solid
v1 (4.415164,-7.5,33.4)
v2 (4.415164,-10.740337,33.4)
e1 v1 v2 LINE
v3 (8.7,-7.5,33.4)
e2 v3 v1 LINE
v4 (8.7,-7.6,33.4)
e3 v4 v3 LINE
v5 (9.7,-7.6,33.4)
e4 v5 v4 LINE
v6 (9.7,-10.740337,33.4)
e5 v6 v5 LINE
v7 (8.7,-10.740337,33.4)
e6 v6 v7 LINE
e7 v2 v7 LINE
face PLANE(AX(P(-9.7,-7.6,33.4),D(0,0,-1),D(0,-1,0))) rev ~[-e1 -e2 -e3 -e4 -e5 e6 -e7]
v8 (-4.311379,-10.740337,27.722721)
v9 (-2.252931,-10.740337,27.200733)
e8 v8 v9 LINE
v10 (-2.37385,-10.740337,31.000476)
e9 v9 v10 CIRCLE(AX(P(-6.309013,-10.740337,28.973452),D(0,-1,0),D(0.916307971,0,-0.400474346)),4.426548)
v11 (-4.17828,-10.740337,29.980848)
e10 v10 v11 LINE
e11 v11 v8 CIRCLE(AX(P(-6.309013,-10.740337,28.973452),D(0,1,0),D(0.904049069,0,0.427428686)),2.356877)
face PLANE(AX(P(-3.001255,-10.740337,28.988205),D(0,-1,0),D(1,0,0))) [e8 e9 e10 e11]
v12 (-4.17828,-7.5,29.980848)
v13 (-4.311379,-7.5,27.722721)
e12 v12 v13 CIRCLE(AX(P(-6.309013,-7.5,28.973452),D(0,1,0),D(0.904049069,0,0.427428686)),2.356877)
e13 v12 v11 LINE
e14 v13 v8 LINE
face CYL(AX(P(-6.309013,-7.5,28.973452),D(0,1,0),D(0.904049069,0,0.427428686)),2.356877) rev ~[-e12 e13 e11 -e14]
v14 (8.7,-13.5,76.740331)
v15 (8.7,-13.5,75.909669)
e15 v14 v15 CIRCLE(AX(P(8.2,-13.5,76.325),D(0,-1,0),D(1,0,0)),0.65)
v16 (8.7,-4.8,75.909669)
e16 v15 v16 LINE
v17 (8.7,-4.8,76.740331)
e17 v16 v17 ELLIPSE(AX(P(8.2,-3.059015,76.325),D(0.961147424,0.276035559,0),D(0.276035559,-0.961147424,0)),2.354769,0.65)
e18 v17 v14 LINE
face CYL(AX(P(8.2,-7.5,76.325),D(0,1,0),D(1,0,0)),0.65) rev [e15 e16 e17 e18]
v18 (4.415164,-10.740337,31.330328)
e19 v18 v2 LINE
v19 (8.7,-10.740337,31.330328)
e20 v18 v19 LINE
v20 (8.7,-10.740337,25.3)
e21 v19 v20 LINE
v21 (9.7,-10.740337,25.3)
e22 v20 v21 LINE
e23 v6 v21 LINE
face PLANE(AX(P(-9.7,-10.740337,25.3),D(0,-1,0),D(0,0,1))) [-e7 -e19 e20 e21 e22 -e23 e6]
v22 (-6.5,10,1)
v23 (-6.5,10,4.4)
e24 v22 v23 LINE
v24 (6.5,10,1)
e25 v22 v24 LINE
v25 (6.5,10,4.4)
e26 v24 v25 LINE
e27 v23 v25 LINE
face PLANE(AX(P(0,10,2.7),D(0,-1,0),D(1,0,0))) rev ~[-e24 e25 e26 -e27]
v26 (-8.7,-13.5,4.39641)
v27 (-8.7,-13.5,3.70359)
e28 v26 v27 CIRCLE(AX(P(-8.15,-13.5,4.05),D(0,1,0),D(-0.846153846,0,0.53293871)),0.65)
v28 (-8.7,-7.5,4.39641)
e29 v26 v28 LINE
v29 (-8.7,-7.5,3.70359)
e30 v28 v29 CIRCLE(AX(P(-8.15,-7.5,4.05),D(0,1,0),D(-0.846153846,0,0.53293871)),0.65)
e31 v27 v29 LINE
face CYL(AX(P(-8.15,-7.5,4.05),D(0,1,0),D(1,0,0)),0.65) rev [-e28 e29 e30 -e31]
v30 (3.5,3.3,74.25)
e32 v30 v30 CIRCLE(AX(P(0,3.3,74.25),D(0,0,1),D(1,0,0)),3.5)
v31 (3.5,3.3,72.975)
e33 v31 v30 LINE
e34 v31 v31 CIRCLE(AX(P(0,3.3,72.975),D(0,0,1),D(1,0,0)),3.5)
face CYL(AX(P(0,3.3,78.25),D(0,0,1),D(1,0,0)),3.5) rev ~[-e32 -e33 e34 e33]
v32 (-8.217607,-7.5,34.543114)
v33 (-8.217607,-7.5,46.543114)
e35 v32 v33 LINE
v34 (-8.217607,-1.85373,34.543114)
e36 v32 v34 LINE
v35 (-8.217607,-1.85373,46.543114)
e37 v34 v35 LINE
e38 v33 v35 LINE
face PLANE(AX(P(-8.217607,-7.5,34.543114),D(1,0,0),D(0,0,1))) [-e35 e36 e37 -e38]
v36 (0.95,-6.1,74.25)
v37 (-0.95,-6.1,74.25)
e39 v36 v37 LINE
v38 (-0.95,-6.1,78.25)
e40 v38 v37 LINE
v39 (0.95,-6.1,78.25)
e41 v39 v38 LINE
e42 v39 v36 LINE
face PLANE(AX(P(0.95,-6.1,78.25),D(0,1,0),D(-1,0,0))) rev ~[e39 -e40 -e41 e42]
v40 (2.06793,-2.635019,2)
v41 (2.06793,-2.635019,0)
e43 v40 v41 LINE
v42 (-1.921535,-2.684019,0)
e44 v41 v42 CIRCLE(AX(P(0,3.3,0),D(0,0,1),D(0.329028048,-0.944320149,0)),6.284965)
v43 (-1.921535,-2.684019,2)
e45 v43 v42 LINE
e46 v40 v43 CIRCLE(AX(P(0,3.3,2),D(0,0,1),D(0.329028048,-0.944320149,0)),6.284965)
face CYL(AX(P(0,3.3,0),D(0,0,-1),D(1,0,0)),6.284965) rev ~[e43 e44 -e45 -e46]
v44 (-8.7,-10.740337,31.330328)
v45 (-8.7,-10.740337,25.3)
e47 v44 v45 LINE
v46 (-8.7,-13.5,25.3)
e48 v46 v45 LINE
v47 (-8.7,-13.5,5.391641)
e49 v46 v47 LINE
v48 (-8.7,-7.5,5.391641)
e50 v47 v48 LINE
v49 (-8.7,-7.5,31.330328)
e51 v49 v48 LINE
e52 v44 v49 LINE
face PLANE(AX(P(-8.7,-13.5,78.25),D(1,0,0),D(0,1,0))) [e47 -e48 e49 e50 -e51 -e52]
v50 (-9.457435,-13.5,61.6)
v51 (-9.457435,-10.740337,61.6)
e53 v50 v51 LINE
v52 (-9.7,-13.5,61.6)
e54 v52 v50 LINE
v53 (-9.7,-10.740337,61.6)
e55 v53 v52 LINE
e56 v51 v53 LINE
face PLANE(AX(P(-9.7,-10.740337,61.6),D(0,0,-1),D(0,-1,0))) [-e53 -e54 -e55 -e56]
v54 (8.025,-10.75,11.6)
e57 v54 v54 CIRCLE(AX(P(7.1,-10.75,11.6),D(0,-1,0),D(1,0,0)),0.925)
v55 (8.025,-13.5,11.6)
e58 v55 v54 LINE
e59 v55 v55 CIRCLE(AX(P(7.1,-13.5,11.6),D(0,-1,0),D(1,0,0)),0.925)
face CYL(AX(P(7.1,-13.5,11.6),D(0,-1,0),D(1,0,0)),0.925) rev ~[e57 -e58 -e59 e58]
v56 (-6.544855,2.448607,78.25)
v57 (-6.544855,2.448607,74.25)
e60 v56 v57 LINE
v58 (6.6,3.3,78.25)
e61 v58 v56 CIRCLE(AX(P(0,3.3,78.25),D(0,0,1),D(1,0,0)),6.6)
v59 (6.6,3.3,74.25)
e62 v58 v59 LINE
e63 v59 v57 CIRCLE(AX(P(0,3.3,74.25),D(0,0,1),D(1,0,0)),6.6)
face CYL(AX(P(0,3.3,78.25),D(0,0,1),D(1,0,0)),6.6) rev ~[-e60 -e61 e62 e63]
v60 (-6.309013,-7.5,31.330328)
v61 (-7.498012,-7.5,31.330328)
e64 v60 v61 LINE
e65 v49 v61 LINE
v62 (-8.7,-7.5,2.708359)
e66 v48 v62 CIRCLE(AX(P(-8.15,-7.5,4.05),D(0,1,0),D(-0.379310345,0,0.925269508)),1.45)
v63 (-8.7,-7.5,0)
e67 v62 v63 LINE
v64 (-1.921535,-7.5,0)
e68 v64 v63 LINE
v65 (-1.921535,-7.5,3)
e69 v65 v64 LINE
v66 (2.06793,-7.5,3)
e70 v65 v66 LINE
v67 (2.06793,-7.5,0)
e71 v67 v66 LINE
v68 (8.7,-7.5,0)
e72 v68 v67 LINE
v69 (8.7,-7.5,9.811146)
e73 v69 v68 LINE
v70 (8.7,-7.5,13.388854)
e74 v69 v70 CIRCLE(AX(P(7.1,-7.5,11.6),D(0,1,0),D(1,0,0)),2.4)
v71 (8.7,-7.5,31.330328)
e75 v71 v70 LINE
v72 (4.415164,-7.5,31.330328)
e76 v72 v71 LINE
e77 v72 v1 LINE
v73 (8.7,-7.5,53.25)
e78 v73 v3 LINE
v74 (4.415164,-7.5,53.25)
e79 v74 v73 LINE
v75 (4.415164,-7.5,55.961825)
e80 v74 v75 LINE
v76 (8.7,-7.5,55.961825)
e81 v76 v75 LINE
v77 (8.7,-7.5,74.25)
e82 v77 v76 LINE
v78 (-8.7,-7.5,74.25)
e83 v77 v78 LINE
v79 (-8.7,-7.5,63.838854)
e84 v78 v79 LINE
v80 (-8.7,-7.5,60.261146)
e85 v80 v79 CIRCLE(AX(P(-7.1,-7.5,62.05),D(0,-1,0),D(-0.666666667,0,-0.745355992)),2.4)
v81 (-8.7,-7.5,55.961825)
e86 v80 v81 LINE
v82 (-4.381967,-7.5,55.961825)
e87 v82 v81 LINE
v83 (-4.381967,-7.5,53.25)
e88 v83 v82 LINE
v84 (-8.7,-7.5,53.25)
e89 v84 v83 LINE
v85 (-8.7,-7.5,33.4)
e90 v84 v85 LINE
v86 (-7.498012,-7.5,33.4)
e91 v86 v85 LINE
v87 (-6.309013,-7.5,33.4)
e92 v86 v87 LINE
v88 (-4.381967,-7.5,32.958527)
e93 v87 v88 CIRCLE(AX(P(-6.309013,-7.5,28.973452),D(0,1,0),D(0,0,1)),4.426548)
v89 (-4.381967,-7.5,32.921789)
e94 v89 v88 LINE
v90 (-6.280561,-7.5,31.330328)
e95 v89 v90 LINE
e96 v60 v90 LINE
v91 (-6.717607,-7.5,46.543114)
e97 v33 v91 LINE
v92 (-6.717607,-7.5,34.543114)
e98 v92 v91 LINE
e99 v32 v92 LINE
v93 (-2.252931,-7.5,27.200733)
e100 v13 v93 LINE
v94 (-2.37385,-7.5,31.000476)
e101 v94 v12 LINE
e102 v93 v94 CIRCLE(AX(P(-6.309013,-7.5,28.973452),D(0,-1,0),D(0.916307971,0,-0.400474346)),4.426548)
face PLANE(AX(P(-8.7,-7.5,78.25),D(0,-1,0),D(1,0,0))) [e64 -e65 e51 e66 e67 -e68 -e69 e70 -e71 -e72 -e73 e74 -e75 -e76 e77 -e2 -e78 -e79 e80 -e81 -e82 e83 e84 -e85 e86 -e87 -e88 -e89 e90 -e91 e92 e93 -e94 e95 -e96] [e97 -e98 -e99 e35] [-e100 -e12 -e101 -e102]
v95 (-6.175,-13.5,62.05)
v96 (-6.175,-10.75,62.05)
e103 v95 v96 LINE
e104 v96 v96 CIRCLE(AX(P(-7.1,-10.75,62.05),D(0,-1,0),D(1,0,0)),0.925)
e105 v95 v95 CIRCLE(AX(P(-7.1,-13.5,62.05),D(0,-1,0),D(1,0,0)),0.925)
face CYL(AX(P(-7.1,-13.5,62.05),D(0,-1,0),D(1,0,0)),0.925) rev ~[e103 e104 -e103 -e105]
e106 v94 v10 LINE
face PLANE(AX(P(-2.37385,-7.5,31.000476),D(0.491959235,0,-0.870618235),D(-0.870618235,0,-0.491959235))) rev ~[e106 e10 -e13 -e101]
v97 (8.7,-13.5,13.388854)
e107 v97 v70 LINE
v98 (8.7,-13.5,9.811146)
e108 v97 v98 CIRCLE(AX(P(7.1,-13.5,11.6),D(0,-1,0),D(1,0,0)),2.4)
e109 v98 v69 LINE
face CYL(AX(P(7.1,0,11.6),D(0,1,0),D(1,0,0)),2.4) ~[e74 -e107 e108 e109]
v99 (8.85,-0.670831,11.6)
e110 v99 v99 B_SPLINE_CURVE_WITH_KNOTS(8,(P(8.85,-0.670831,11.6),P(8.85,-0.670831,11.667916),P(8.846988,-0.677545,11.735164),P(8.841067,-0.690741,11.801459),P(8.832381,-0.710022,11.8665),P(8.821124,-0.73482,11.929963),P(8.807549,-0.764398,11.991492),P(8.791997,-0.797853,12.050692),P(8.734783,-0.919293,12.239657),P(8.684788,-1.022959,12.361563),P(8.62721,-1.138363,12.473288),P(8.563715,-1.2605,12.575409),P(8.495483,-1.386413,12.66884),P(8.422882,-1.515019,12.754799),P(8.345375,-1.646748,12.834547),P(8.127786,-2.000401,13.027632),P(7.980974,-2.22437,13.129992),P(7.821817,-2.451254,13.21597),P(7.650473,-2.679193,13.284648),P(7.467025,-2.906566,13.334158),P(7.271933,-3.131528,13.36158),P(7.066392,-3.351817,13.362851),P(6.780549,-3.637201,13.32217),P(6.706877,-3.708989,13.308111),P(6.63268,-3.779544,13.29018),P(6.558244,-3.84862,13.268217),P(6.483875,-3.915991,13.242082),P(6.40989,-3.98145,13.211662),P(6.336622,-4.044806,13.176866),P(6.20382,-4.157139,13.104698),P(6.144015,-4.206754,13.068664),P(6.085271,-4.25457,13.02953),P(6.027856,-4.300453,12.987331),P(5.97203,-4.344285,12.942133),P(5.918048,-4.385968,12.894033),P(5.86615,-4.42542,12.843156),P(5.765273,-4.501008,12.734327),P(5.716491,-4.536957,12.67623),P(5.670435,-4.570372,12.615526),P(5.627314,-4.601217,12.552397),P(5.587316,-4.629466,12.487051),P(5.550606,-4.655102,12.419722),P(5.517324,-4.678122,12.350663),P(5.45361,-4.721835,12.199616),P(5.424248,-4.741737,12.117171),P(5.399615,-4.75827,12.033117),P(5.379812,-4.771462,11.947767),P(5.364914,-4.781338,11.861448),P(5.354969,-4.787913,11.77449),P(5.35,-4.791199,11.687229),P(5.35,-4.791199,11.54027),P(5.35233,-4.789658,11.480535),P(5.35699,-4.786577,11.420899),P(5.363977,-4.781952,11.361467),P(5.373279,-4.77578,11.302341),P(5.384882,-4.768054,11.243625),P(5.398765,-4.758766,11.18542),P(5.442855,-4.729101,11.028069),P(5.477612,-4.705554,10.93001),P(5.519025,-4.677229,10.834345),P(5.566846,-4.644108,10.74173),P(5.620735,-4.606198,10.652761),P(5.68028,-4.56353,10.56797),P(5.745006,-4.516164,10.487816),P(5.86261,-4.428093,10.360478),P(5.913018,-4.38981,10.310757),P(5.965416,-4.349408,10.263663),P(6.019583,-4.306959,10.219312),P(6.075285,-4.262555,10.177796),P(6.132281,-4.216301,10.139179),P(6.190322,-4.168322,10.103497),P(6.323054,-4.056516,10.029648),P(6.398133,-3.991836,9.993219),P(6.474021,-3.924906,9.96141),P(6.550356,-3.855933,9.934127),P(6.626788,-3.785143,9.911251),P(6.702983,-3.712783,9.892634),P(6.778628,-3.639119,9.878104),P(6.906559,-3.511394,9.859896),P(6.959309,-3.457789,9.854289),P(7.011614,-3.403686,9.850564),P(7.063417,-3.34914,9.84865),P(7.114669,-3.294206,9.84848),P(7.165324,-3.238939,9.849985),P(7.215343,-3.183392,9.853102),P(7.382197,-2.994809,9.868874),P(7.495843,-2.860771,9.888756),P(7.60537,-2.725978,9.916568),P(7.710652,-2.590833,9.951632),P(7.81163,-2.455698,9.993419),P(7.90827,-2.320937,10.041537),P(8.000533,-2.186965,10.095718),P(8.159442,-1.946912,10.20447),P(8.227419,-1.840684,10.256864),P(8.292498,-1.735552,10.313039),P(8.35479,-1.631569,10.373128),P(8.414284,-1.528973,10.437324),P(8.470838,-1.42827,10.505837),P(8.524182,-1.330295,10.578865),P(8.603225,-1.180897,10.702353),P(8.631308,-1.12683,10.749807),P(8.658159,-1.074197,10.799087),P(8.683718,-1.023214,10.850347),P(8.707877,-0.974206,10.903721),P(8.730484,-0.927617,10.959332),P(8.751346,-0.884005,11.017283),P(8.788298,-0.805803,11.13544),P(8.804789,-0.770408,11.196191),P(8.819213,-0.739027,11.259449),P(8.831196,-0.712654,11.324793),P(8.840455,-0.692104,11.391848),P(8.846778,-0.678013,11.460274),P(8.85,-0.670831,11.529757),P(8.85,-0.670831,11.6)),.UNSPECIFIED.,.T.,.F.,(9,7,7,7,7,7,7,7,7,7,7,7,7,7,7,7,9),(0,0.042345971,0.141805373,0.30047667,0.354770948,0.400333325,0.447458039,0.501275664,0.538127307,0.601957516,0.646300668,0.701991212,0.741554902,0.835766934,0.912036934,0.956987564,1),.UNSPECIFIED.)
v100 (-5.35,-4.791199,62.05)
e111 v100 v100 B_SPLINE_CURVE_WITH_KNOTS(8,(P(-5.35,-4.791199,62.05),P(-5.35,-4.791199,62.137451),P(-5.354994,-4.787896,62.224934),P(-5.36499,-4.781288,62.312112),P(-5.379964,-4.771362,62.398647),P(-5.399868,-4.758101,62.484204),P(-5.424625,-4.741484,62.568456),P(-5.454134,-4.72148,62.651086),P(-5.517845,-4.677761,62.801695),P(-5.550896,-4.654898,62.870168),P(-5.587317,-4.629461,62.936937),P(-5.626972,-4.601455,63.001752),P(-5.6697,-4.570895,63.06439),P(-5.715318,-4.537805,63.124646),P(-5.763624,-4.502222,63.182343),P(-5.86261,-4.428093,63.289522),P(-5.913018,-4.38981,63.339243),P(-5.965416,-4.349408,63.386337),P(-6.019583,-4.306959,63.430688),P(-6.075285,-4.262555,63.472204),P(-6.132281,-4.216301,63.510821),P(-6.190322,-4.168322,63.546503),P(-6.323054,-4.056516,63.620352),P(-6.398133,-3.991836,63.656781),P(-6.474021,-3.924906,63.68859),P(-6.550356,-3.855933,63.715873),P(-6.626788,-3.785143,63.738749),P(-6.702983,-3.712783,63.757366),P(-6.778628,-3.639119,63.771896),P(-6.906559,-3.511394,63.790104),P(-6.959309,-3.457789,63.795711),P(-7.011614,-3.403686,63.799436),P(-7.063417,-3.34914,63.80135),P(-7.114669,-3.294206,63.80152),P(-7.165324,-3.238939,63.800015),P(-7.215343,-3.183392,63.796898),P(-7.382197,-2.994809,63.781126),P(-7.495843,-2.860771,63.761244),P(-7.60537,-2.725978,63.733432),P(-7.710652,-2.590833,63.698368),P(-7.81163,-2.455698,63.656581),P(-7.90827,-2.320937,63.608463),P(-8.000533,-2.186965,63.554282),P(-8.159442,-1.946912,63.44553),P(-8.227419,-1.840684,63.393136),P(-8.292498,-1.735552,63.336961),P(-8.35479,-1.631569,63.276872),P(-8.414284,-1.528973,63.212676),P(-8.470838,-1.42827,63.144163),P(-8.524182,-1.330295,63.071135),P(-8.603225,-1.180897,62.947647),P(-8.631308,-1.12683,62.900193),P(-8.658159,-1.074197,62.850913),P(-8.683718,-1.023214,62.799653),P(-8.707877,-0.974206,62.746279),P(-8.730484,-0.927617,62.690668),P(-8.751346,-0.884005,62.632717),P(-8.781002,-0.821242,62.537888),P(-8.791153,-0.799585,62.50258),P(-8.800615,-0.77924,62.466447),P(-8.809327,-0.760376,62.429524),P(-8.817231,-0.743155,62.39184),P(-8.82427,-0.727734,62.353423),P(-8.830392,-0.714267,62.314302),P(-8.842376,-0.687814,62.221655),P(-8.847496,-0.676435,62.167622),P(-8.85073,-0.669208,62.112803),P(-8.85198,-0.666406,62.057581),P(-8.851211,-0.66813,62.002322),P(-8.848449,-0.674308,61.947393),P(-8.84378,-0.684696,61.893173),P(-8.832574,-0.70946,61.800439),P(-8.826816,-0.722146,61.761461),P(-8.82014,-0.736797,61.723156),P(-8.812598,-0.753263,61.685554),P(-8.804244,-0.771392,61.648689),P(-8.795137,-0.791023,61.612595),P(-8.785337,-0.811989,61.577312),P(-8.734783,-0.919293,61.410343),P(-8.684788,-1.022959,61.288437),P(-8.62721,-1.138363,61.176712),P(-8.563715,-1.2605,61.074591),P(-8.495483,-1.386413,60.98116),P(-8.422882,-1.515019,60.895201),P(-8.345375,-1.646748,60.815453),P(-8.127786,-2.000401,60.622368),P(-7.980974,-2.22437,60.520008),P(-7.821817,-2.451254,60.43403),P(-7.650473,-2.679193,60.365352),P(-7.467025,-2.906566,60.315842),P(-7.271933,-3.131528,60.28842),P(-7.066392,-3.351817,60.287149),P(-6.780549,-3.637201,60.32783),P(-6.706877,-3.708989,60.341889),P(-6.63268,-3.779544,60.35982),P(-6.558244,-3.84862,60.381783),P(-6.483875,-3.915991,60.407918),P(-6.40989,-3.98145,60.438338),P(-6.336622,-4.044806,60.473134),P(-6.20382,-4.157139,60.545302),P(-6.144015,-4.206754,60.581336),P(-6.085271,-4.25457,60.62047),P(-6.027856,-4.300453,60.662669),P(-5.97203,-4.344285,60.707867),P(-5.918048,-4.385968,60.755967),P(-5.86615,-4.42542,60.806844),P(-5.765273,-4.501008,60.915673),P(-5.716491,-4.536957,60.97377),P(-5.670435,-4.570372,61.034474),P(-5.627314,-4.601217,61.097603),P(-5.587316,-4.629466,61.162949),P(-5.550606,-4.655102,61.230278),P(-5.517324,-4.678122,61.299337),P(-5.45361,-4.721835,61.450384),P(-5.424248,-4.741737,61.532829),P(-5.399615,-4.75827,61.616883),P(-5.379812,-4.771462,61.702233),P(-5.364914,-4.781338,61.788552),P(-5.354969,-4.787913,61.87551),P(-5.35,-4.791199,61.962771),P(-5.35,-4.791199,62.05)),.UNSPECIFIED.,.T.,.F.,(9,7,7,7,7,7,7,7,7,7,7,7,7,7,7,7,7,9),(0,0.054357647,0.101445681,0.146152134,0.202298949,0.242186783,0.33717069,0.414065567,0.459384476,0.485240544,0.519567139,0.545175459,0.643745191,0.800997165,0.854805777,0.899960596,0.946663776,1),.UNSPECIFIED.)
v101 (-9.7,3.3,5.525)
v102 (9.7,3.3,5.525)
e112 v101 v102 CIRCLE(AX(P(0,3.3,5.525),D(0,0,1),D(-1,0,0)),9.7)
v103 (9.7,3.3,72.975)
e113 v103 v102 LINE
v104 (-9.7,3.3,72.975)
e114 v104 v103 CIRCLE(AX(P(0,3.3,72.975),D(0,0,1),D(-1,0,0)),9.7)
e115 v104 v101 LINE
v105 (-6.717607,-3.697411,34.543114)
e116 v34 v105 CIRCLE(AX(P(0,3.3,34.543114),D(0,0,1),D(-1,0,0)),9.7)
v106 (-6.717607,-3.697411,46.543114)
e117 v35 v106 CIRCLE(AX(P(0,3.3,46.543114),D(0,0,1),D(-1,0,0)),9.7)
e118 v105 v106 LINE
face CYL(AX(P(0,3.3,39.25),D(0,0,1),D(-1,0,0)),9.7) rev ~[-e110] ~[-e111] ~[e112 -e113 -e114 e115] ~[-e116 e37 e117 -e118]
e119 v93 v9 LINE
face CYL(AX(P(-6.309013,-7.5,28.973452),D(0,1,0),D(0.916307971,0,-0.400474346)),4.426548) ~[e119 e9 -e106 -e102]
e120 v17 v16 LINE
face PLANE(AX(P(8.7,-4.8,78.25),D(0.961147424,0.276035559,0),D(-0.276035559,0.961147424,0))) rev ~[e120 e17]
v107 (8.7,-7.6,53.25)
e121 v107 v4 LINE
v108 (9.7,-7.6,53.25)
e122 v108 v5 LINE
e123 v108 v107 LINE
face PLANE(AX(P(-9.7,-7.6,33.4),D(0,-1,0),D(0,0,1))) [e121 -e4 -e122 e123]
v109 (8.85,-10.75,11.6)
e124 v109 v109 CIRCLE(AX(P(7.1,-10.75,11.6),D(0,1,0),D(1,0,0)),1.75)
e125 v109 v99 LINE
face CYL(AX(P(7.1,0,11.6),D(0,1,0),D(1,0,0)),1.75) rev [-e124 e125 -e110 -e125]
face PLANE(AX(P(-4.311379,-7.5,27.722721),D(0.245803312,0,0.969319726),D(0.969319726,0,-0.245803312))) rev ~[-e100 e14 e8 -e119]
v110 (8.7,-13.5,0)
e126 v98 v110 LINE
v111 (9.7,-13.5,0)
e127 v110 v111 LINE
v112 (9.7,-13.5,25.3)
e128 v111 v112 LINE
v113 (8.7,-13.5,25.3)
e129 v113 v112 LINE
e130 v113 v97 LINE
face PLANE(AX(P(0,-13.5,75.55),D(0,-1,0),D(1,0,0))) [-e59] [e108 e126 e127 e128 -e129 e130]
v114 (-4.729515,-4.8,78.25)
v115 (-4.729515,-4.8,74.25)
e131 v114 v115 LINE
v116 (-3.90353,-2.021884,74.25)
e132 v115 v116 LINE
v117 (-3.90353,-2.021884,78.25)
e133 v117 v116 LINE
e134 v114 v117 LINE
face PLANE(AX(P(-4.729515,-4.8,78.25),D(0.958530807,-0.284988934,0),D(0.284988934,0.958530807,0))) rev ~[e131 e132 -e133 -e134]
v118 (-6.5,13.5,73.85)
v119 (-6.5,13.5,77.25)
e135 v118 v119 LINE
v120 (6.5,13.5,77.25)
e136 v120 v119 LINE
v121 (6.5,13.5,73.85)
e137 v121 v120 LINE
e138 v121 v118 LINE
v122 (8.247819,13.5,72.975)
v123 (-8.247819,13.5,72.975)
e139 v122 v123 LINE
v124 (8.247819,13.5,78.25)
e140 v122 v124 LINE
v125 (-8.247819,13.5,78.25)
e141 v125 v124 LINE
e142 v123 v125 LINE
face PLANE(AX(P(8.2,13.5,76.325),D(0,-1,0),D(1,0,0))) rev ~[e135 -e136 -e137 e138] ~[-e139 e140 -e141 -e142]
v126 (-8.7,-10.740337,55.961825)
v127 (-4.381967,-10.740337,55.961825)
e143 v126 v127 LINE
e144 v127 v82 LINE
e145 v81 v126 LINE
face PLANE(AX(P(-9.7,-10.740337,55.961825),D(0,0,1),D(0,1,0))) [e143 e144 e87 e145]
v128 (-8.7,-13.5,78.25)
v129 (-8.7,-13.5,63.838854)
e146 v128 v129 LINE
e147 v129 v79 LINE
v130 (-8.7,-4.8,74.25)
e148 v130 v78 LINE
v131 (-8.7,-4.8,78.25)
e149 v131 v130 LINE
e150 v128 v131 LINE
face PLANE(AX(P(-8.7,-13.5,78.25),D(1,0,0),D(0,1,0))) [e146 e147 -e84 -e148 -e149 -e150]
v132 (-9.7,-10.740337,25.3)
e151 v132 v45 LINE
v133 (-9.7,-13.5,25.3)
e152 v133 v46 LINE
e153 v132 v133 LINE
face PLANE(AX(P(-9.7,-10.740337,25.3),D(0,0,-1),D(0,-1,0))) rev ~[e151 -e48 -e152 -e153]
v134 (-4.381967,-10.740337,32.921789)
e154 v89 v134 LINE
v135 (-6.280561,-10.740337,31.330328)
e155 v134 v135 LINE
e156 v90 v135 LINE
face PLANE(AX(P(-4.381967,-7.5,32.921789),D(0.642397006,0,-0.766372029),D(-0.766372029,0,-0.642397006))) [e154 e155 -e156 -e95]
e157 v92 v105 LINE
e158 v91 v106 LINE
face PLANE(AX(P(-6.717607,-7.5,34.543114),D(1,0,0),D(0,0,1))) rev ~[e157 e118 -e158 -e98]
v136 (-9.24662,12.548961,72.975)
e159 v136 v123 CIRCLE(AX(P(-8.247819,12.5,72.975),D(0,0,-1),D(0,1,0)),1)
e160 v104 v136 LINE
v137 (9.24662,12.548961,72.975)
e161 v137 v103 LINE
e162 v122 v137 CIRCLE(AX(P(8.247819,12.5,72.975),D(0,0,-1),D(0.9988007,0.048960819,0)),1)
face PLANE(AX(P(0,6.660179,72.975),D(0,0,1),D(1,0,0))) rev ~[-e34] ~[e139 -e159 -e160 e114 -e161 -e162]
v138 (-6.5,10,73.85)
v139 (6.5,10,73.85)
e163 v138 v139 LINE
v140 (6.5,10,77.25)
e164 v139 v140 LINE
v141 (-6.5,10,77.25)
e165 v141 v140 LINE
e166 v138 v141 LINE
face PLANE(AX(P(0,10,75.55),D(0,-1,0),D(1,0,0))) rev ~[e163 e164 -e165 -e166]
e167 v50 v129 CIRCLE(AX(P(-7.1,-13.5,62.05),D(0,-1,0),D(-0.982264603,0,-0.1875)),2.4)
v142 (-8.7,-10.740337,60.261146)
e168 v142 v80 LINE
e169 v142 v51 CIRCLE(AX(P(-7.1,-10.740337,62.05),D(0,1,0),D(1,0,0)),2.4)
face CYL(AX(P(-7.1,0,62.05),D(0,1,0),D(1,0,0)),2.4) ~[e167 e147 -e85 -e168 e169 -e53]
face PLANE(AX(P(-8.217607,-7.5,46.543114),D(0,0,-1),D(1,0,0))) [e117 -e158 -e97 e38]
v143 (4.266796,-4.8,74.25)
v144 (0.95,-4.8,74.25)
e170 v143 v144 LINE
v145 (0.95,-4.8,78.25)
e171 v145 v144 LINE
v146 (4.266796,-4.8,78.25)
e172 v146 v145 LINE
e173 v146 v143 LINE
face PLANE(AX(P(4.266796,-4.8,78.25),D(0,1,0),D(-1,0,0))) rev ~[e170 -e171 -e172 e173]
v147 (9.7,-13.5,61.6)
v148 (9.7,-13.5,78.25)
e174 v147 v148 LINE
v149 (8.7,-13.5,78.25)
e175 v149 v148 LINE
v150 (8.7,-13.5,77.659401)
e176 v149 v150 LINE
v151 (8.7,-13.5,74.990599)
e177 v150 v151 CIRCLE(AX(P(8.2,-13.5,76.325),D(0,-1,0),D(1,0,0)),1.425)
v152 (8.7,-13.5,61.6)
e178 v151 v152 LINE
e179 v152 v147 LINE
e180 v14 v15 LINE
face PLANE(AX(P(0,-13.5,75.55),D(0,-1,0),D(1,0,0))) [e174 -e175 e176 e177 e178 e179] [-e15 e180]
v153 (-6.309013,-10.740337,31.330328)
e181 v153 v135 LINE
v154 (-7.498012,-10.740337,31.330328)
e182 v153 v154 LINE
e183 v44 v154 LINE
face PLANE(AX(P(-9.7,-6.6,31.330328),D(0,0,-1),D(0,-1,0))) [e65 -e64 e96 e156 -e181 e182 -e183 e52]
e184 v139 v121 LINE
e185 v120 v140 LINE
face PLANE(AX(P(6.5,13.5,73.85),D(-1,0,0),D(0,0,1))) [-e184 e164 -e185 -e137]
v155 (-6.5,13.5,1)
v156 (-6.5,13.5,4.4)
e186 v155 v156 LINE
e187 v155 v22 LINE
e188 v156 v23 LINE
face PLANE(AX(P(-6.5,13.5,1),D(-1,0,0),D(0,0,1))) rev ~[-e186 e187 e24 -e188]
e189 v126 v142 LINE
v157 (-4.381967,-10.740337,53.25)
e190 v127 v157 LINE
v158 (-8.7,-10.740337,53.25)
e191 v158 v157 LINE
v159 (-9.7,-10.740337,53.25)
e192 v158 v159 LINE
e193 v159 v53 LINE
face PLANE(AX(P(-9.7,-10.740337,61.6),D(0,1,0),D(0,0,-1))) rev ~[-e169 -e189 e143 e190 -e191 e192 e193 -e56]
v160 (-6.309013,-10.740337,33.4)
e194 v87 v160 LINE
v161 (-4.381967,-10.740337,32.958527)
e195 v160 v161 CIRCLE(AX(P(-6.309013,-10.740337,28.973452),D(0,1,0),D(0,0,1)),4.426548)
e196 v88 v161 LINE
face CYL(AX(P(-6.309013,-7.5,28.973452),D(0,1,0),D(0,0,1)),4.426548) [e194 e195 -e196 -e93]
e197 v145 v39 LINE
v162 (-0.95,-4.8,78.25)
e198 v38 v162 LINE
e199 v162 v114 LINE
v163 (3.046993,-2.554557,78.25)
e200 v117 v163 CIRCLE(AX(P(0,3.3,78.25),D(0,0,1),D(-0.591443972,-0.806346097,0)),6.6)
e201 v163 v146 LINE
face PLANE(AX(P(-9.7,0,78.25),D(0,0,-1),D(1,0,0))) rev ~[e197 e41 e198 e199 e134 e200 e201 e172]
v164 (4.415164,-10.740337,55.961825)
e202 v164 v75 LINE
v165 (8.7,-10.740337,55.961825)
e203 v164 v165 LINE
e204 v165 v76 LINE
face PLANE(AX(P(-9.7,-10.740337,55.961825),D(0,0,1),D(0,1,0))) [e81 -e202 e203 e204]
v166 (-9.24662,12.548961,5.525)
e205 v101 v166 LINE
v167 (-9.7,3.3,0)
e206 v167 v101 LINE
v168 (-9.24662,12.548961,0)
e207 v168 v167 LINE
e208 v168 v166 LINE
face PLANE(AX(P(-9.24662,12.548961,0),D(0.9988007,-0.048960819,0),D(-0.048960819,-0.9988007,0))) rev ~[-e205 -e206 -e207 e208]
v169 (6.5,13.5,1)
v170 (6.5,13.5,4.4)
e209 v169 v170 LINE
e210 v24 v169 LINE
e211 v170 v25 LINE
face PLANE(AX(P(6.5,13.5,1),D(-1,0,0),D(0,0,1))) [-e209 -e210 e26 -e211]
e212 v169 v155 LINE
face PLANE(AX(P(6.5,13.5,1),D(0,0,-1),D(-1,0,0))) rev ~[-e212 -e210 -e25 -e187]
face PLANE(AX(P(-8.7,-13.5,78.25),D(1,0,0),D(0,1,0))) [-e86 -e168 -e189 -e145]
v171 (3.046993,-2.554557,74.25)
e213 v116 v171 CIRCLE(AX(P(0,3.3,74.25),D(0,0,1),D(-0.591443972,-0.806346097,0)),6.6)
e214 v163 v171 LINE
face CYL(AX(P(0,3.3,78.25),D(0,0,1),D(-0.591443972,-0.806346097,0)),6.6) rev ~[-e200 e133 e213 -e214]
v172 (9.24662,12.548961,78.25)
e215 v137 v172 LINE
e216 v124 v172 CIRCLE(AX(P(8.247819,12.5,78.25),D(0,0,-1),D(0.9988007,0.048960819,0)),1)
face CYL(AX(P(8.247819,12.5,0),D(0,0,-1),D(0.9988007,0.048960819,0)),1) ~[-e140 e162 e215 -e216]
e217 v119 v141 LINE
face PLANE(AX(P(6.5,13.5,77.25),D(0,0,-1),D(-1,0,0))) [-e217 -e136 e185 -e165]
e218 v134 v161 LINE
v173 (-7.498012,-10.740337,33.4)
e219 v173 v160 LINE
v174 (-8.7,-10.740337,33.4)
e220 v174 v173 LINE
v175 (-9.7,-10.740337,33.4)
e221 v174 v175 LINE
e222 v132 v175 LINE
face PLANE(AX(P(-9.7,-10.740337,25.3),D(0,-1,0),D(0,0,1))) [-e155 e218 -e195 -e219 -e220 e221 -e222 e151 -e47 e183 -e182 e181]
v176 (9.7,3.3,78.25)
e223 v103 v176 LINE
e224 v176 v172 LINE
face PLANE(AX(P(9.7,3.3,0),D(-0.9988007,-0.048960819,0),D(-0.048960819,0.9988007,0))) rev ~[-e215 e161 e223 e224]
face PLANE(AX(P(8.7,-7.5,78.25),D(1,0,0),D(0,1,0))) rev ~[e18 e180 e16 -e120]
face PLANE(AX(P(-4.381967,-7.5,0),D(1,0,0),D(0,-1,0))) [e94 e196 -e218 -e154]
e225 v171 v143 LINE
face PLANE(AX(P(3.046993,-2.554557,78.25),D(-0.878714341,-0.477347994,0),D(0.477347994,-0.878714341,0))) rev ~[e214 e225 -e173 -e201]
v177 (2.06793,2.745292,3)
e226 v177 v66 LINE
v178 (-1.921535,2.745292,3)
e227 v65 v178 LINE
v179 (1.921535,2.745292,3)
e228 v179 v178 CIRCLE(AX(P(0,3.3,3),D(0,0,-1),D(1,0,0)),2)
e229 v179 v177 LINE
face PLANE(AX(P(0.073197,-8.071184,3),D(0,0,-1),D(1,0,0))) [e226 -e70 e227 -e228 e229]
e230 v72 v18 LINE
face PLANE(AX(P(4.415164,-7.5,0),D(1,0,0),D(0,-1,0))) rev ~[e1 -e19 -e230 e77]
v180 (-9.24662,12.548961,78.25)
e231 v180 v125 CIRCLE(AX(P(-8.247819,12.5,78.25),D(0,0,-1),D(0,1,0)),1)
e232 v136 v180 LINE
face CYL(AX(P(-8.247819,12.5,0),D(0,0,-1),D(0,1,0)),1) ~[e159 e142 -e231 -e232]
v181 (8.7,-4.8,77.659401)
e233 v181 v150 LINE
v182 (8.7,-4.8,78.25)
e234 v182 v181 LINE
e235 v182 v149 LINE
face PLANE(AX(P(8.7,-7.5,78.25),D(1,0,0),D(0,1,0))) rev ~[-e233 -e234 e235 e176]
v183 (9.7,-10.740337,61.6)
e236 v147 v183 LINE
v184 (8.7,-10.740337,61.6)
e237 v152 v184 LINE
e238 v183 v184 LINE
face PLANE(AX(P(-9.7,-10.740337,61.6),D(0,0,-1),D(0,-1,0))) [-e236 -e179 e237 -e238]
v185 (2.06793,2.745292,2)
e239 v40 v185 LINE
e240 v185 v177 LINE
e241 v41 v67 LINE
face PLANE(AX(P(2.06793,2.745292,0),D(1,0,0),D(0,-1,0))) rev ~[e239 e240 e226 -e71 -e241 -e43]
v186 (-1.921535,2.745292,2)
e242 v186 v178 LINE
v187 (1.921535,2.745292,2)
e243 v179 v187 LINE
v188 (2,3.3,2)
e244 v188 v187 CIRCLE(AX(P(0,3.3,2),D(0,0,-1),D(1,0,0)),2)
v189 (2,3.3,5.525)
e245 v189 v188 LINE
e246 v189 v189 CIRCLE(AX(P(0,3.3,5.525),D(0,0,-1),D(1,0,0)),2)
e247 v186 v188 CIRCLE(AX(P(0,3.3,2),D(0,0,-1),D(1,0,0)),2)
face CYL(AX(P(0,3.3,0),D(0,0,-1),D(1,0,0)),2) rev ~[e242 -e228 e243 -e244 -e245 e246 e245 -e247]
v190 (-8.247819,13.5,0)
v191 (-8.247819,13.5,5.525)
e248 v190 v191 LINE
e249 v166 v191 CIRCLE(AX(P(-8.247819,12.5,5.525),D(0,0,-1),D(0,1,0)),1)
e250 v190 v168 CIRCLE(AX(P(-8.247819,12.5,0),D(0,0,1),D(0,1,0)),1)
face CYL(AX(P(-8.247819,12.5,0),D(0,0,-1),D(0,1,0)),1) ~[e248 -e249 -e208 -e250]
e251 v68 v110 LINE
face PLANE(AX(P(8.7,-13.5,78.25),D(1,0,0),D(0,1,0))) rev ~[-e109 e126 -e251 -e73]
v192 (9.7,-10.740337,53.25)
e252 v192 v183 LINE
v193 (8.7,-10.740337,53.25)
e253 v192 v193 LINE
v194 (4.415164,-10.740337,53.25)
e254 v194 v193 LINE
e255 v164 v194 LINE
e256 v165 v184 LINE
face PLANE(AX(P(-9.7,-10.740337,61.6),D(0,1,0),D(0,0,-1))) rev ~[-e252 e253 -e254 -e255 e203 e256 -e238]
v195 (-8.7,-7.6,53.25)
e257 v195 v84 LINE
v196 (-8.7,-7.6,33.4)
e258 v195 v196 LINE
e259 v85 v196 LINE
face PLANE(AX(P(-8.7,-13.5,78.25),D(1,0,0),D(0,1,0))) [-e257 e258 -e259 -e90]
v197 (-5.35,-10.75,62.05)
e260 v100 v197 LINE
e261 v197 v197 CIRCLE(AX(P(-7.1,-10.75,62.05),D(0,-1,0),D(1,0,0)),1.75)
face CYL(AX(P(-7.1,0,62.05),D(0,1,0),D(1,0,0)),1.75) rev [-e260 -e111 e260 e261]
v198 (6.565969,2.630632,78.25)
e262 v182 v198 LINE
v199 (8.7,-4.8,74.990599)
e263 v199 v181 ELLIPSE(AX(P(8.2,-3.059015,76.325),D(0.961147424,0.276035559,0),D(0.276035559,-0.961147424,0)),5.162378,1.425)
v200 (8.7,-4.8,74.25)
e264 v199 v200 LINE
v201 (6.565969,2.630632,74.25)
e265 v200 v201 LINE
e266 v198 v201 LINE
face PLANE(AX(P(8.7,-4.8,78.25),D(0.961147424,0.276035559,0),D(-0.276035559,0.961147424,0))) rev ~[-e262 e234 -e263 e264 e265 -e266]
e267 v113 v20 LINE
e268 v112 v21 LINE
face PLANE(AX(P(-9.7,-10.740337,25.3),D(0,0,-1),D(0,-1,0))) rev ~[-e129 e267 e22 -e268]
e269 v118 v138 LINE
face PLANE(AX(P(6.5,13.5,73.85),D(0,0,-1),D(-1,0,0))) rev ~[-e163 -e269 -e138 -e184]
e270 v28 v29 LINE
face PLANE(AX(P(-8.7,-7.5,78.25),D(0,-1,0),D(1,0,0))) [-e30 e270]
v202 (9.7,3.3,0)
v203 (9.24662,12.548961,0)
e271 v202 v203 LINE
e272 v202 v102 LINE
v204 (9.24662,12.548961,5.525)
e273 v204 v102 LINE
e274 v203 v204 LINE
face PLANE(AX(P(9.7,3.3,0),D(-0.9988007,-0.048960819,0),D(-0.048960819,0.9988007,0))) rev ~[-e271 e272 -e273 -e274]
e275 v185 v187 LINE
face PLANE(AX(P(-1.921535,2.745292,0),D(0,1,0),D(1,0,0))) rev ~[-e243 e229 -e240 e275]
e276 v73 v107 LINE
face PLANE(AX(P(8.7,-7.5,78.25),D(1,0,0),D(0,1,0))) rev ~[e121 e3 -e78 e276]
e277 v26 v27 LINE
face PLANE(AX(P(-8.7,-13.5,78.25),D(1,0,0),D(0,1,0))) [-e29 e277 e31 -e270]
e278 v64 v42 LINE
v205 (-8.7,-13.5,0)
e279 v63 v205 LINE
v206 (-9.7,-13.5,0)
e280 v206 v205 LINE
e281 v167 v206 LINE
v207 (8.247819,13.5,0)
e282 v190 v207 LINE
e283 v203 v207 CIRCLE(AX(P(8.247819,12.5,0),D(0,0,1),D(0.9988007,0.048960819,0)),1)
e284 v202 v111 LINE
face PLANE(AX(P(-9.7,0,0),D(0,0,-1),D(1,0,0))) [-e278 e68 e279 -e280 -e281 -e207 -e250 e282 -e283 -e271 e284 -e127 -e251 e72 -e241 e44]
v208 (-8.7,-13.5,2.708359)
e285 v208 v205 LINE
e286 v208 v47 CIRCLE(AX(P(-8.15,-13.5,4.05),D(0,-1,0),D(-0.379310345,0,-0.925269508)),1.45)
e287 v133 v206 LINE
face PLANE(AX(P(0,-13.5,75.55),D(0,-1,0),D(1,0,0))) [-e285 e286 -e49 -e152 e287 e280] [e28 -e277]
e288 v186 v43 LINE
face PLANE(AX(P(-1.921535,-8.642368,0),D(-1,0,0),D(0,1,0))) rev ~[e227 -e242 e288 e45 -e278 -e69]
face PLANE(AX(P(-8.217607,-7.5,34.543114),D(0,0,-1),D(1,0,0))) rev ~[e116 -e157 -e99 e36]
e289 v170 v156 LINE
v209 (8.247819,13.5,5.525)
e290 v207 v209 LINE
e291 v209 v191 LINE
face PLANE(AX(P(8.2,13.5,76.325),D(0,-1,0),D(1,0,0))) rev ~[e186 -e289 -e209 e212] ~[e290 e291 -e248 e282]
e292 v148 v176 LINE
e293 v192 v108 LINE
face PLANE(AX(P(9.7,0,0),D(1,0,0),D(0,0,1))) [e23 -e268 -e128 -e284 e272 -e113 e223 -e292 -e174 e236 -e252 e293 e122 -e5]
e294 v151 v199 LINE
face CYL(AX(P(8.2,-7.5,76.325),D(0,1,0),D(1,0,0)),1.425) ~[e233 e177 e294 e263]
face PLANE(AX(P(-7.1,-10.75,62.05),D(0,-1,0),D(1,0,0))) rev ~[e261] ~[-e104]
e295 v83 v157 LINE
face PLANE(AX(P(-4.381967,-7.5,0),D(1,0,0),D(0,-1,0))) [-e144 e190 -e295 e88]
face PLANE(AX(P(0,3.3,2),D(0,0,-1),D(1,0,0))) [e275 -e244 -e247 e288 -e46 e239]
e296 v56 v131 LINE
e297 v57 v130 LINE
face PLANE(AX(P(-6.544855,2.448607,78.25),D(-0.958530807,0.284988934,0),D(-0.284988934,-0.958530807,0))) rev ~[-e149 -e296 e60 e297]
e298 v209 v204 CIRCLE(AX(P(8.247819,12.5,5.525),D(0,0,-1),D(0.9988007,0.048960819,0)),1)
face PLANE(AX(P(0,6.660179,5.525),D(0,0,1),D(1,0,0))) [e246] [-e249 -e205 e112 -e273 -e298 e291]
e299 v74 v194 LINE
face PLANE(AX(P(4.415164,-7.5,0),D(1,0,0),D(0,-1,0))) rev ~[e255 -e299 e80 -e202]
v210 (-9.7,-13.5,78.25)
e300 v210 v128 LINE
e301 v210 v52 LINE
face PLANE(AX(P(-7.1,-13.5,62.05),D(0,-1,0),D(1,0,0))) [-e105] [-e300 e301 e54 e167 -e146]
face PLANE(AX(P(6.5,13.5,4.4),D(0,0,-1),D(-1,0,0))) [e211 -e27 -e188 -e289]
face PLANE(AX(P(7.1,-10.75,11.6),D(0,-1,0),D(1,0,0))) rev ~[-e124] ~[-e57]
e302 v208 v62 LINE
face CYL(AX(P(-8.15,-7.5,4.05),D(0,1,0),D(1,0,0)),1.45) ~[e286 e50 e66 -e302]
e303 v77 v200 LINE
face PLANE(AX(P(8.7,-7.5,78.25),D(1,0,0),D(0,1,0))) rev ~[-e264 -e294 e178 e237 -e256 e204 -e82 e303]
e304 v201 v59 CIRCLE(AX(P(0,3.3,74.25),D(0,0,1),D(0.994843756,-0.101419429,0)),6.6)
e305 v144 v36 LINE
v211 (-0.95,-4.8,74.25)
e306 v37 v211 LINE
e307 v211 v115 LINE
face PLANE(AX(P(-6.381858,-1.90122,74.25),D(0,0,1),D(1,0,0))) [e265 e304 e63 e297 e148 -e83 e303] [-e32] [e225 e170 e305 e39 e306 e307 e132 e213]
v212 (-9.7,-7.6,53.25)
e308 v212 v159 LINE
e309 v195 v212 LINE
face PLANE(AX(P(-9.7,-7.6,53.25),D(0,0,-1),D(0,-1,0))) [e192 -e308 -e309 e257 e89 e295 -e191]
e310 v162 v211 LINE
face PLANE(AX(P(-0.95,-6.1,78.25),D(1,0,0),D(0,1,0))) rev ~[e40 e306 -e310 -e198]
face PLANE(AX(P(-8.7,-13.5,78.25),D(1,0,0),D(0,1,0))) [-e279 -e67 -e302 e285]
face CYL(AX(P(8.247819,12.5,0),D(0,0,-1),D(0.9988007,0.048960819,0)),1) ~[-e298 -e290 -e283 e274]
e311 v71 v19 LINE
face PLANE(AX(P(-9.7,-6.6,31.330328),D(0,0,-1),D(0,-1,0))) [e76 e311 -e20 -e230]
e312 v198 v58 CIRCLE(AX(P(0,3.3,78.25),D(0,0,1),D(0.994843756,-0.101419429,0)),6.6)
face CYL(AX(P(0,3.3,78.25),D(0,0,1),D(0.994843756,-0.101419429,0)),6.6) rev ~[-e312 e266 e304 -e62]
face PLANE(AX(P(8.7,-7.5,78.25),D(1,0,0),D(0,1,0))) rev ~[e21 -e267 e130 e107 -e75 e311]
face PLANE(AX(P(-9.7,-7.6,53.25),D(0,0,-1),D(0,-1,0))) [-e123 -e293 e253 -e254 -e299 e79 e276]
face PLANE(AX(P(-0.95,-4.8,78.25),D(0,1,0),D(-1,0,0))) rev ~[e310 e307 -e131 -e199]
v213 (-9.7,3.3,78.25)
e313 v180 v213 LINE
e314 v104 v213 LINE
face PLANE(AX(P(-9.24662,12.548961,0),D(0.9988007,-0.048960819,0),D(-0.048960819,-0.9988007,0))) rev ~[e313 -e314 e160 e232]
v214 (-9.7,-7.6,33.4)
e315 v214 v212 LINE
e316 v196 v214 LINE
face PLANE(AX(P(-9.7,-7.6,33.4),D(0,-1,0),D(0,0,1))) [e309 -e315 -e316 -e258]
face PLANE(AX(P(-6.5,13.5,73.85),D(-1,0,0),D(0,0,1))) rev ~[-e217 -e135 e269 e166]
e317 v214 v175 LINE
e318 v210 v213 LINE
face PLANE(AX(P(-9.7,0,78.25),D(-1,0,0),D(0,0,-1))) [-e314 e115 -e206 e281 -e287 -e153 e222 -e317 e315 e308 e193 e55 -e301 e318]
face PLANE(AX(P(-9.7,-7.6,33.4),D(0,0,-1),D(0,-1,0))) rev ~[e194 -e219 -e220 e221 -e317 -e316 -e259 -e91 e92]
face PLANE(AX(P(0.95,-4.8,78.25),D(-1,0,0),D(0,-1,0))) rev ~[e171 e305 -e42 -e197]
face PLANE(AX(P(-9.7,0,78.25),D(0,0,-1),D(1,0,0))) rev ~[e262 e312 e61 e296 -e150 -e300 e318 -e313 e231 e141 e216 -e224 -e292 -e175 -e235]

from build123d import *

# Parameters (mm, degrees)
F1_W           = 19.4
F1_H           = 5.4
F1_W_2         = 13
F1_H_2         = 3.4
F1_H_3         = 67.45
F1_R           = 2.4
F1_R_2         = 1.75
F2_DEPTH       = 13.5
F4_START       = -10
F4_DEPTH       = 17
F5_W           = 13
F5_H           = 3.4
F6_DEPTH       = 2.1
F7_DEPTH       = 2.25
F8_R           = 3.5
F9_DEPTH       = 7.5
F10_R          = 2
F11_DEPTH      = 7.5
F12_R          = 3.5
F13_DEPTH      = 4
F12_W          = 17.4
F12_H          = 6
F14_DEPTH      = 80
F15_W          = 3.989465184
F15_H          = 1.1423683461
F16_DEPTH      = 3
F17_W          = 2.7596634789
F17_H          = 19.85
F17_H_2        = 8.35
F17_W_2        = 3.1403365211
F17_H_3        = 8.1
F18_DEPTH      = 20
F19_W          = 1
F19_H          = 2.0696715653
F19_W_2        = 3.1403365211
F20_DEPTH      = 18.4
F21_DEPTH      = 25
F22_DEPTH      = 13.5
F23_W          = 8.7971314788
F23_H          = 3.2557382435
F24_DEPTH      = 80
F25_R          = 1.425
F25_R_2        = 0.65
F25_R_3        = 1.45
F26_DEPTH      = 21
F26_DEPTH_BACK = 6
F27_R          = 1.75
F27_R_2        = 0.925
F27_R_3        = 1.8673061799
F28_DEPTH      = 2.75
F29_W          = 1.5
F29_H          = 12
F30_DEPTH      = 21.001
F31_DEPTH      = 33.725
F32_R          = 6.2849648465
F33_DEPTH      = 2
F35_DEPTH      = 3.2403365211
F36_DEPTH      = 3.2403365211
F38_DEPTH      = 78.251


with BuildPart() as f2:
    # F1 (on Front) → F2 (new body, symmetric)
    with BuildSketch(Plane.XZ):
        with Locations((0, 75.55)):
            Rectangle(F1_W, F1_H)
        with Locations((0, 75.55)):
            Rectangle(F1_W_2, F1_H_2, mode=Mode.SUBTRACT)
        with Locations((0, 39.125)):
            Rectangle(F1_W, F1_H_3)
        with Locations((7.1, 11.6)):
            Circle(F1_R, mode=Mode.SUBTRACT)
        with Locations((-7.1, 62.05)):
            Circle(F1_R, mode=Mode.SUBTRACT)
        with Locations((-7.1, 62.05)):
            Circle(F1_R)
        with Locations((-7.1, 62.05)):
            Circle(F1_R_2, mode=Mode.SUBTRACT)
        with Locations((7.1, 11.6)):
            Circle(F1_R)
        with Locations((7.1, 11.6)):
            Circle(F1_R_2, mode=Mode.SUBTRACT)
        with Locations((0, 2.7)):
            Rectangle(F1_W, F1_H)
        with Locations((0, 2.7)):
            Rectangle(F1_W_2, F1_H_2, mode=Mode.SUBTRACT)
        with Locations((0, 2.7)):
            Rectangle(F1_W_2, F1_H_2)
        with Locations((0, 75.55)):
            Rectangle(F1_W_2, F1_H_2)
    extrude(amount=F2_DEPTH, both=True)

    # F1 (on Front) → F4 (cut)
    with BuildSketch(Plane.XZ.offset(F4_START)):
        with Locations((0, 2.7)):
            Rectangle(F1_W_2, F1_H_2)
        with Locations((0, 75.55)):
            Rectangle(F1_W_2, F1_H_2)
    extrude(amount=-F4_DEPTH, mode=Mode.SUBTRACT)

    # F5 (on face) → F6 (join)
    with BuildSketch(Plane(origin=(0, 13.5, 0), x_dir=(-1, 0, 0), z_dir=(0, 1, 0))):
        with Locations((0, 75.55)):
            Rectangle(F5_W, F5_H)
        with Locations((0, 2.7)):
            Rectangle(F5_W, F5_H)
    extrude(amount=-F6_DEPTH)

    # F5 (on face) → F7 (cut)
    with BuildSketch(Plane(origin=(0, 13.5, 0), x_dir=(-1, 0, 0), z_dir=(0, 1, 0))):
        with Locations((0, 75.55)):
            Rectangle(F5_W, F5_H)
        with Locations((0, 2.7)):
            Rectangle(F5_W, F5_H)
    extrude(amount=-F7_DEPTH, mode=Mode.SUBTRACT)

    # F8 (on face) → F9 (cut, symmetric)
    with BuildSketch(Plane.XY.offset(78.25)):
        with Locations((0, 3.3)):
            Circle(F8_R)
    extrude(amount=F9_DEPTH, both=True, mode=Mode.SUBTRACT)

    # F10 (on face) → F11 (cut, symmetric)
    with BuildSketch(Plane(origin=(0, 0, 0), x_dir=(1, 0, 0), z_dir=(0, 0, -1))):
        with Locations((0, -3.3)):
            Circle(F10_R)
    extrude(amount=F11_DEPTH, both=True, mode=Mode.SUBTRACT)

    # F12 (on face) → F13 (cut)
    with BuildSketch(Plane.XY.offset(78.25)):
        with BuildLine():
            Line((-6.5448551873, 2.4486066849), (-8.7, -4.8))
            Line((-8.7, -4.8), (-4.7295154072, -4.8))
            Line((-4.7295154072, -4.8), (-3.9035302168, -2.0218842383))
            ThreePointArc((-3.9035302168, -2.0218842383), (-5.6822980969, -0.0573037304), (-6.5448551873, 2.4486066849))
        make_face()
        with BuildLine():
            Line((8.7, -4.8), (6.5659687916, 2.6306317698))
            ThreePointArc((6.5659687916, 2.6306317698), (5.4611174799, -0.4062374277), (3.0469932229, -2.5545565417))
            Line((3.0469932229, -2.5545565417), (4.2667957023, -4.8))
            Line((4.2667957023, -4.8), (8.7, -4.8))
        make_face()
        Polygon((-4.7295154072, -4.8), (-8.7, -4.8), (-8.7, -7.5), (8.7, -7.5), (8.7, -4.8), (4.2667957023, -4.8), (0.95, -4.8), (0.95, -6.1), (-0.95, -6.1), (-0.95, -4.8), align=None)
        with BuildLine():
            ThreePointArc((6.6, 3.3), (-0.4265886565, 9.8861993682), (-6.5448551873, 2.4486066849))
            ThreePointArc((-6.5448551873, 2.4486066849), (-5.6822980969, -0.0573037304), (-3.9035302168, -2.0218842383))
            ThreePointArc((-3.9035302168, -2.0218842383), (-0.5043301014, -3.2807029373), (3.0469932229, -2.5545565417))
            ThreePointArc((3.0469932229, -2.5545565417), (5.4611174799, -0.4062374277), (6.5659687916, 2.6306317698))
            ThreePointArc((6.5659687916, 2.6306317698), (6.5914867073, 2.9648836207), (6.6, 3.3))
        make_face()
        with Locations((0, 3.3)):
            Circle(F12_R, mode=Mode.SUBTRACT)
    extrude(amount=-F13_DEPTH, mode=Mode.SUBTRACT)

    # F12 (on face) → F14 (cut)
    with BuildSketch(Plane.XY.offset(78.25)):
        with Locations((0, -10.5)):
            Rectangle(F12_W, F12_H)
    extrude(amount=-F14_DEPTH, mode=Mode.SUBTRACT)

    # F15 (on face) → F16 (cut)
    with BuildSketch(Plane(origin=(0, 0, 0), x_dir=(1, 0, 0), z_dir=(0, 0, -1))):
        with Locations((0.0731971226, 8.0711841731)):
            Rectangle(F15_W, F15_H)
        with BuildLine():
            ThreePointArc((1.9215354694, -2.7452915722), (0, -1.3), (-1.9215354694, -2.7452915722))
            Line((-1.9215354694, -2.7452915722), (1.9215354694, -2.7452915722))
        make_face()
        with BuildLine():
            Line((-1.9215354694, 7.5), (-1.9215354694, -2.7452915722))
            ThreePointArc((-1.9215354694, -2.7452915722), (0, -1.3), (1.9215354694, -2.7452915722))
            Line((1.9215354694, -2.7452915722), (2.0679297146, -2.7452915722))
            Line((2.0679297146, -2.7452915722), (2.0679297146, 7.5))
            Line((2.0679297146, 7.5), (-1.9215354694, 7.5))
        make_face()
    extrude(amount=-F16_DEPTH, mode=Mode.SUBTRACT)

    # F17 (on face) → F18 (cut, symmetric)
    with BuildSketch(Plane(origin=(-9.7, 0, 0), x_dir=(0, -1, 0), z_dir=(-1, 0, 0))):
        with Locations((12.1201682605, 43.325)):
            Rectangle(F17_W, F17_H)
        with Locations((12.1201682605, 57.425)):
            Rectangle(F17_W, F17_H_2)
        with Locations((9.1701682605, 43.325)):
            Rectangle(F17_W_2, F17_H)
        with Locations((12.1201682605, 29.35)):
            Rectangle(F17_W, F17_H_3)
    extrude(amount=F18_DEPTH, both=True, mode=Mode.SUBTRACT)

    # F19 (on face) → F20 (join, through all)
    with BuildSketch(Plane(origin=(-9.7, 0, 0), x_dir=(0, -1, 0), z_dir=(-1, 0, 0))):
        Polygon((6.6, 53.25), (7.6, 53.25), (10.7403365211, 53.25), (10.7403365211, 55.9618249536), (6.6, 55.9618249536), align=None)
        with Locations((7.1, 32.3651642174)):
            Rectangle(F19_W, F19_H)
        with Locations((9.1701682605, 32.3651642174)):
            Rectangle(F19_W_2, F19_H)
    extrude(amount=-F20_DEPTH)

    # F1 (on Front) → F21 (cut)
    with BuildSketch(Plane.XZ):
        with Locations((-7.1, 62.05)):
            Circle(F1_R_2)
    extrude(amount=F21_DEPTH, mode=Mode.SUBTRACT)

    # F1 (on Front) → F22 (join, through all)
    with BuildSketch(Plane.XZ):
        with Locations((7.1, 11.6)):
            Circle(F1_R)
        with Locations((7.1, 11.6)):
            Circle(F1_R_2, mode=Mode.SUBTRACT)
        with Locations((-7.1, 62.05)):
            Circle(F1_R)
        with Locations((-7.1, 62.05)):
            Circle(F1_R_2, mode=Mode.SUBTRACT)
    extrude(amount=F22_DEPTH)

    # F23 (on face) → F24 (cut)
    with BuildSketch(Plane(origin=(0, 0, 0), x_dir=(1, 0, 0), z_dir=(0, 0, -1))):
        with Locations((0.0165984966, 9.1278691217)):
            Rectangle(F23_W, F23_H)
    extrude(amount=-F24_DEPTH, mode=Mode.SUBTRACT)

    # F25 (on face) → F26 (join, two sides)
    with BuildSketch(Plane.XZ.offset(7.5)) as f26_sk:
        with Locations((8.2, 76.325)):
            Circle(F25_R)
        with Locations((8.2, 76.325)):
            Circle(F25_R_2, mode=Mode.SUBTRACT)
        with Locations((-8.15, 4.05)):
            Circle(F25_R_3)
        with Locations((-8.15, 4.05)):
            Circle(F25_R_2, mode=Mode.SUBTRACT)
    extrude(amount=-F26_DEPTH)
    extrude(f26_sk.sketch, amount=F26_DEPTH_BACK)

    # F27 (on face) → F28 (join)
    with BuildSketch(Plane.XZ.offset(13.5)):
        with Locations((-7.1, 62.05)):
            Circle(F27_R)
        with Locations((-7.1, 62.05)):
            Circle(F27_R_2, mode=Mode.SUBTRACT)
        with Locations((7.1, 11.6)):
            Circle(F27_R_3)
        with Locations((7.1, 11.6)):
            Circle(F27_R_2, mode=Mode.SUBTRACT)
    extrude(amount=-F28_DEPTH)

    # F29 (on face) → F30 (cut, through all)
    with BuildSketch(Plane.XZ.offset(7.5)):
        with Locations((-7.467607037, 40.5431138873)):
            Rectangle(F29_W, F29_H)
    extrude(amount=-F30_DEPTH, mode=Mode.SUBTRACT)

    # F3 (on offset) → F31 (cut, symmetric)
    with BuildSketch(Plane.XY.offset(39.25)):
        with BuildLine():
            ThreePointArc((9.7, 3.3), (0, 13), (-9.7, 3.3))
            Line((-9.7, 3.3), (9.7, 3.3))
        make_face()
        with BuildLine():
            Line((-9.7, 13.5), (-9.7, 3.3))
            ThreePointArc((-9.7, 3.3), (0, 13), (9.7, 3.3))
            Line((9.7, 3.3), (9.7, 13.5))
            Line((9.7, 13.5), (-9.7, 13.5))
        make_face()
        with BuildLine():
            Line((9.7, 3.3), (-9.7, 3.3))
            ThreePointArc((-9.7, 3.3), (0, -6.4), (9.7, 3.3))
        make_face()
    extrude(amount=F31_DEPTH, both=True, mode=Mode.SUBTRACT)

    # F32 (on face) → F33 (cut)
    with BuildSketch(Plane(origin=(0, 0, 0), x_dir=(1, 0, 0), z_dir=(0, 0, -1))):
        with Locations((0, -3.3)):
            Circle(F32_R)
    extrude(amount=-F33_DEPTH, mode=Mode.SUBTRACT)

    # F34 (on face) → F35 (cut, through all)
    with BuildSketch(Plane.XZ.offset(7.5)):
        Polygon((-4.3819672428, 33.6735062301), (-7.4980124951, 33.6735062301), (-7.4980124951, 33.4), (-6.309012777, 33.4), (-4.3819672428, 33.4), align=None)
        Polygon((-4.3819672428, 31.3303284347), (-4.3819672428, 32.9217889321), (-6.2805607904, 31.3303284347), align=None)
        with BuildLine():
            ThreePointArc((-2.2529312209, 27.2007325665), (-1.8847040899, 29.114246198), (-2.3738502676, 31.000475679))
            Line((-2.3738502676, 31.000475679), (-4.1782804969, 29.9808483851))
            ThreePointArc((-4.1782804969, 29.9808483851), (-3.9562194224, 28.8347732192), (-4.3113791264, 27.7227206164))
            Line((-4.3113791264, 27.7227206164), (-2.2529312209, 27.2007325665))
        make_face()
        with BuildLine():
            ThreePointArc((-2.3738502676, 31.000475679), (-3.2077114124, 32.1319734864), (-4.3542633766, 32.9450111793))
            Line((-4.3542633766, 32.9450111793), (-4.3819672428, 32.9217889321))
            Line((-4.3819672428, 32.9217889321), (-4.3819672428, 31.3303284347))
            Line((-4.3819672428, 31.3303284347), (-4.3819672428, 30.8272019029))
            Line((-4.3819672428, 30.8272019029), (-4.8535134819, 30.8272019029))
            ThreePointArc((-4.8535134819, 30.8272019029), (-4.4666385487, 30.443324235), (-4.1782804969, 29.9808483851))
            Line((-4.1782804969, 29.9808483851), (-2.3738502676, 31.000475679))
        make_face()
        with BuildLine():
            Line((-4.3819672428, 31.3303284347), (-6.2805607904, 31.3303284347))
            Line((-6.2805607904, 31.3303284347), (-6.2807627766, 31.3301591235))
            ThreePointArc((-6.2807627766, 31.3301591235), (-5.6213249589, 31.2277705376), (-5.0170200476, 30.9446500116))
            ThreePointArc((-5.0170200476, 30.9446500116), (-4.9340121876, 30.8876725294), (-4.8535134819, 30.8272019029))
            Line((-4.8535134819, 30.8272019029), (-4.3819672428, 30.8272019029))
            Line((-4.3819672428, 30.8272019029), (-4.3819672428, 31.3303284347))
        make_face()
        with BuildLine():
            ThreePointArc((-6.309012777, 31.3303284347), (-6.9249139857, 31.2484316241), (-7.4980124951, 31.0084326969))
            Line((-7.4980124951, 31.0084326969), (-7.4980124951, 30.8272019029))
            Line((-7.4980124951, 30.8272019029), (-4.8535134819, 30.8272019029))
            ThreePointArc((-4.8535134819, 30.8272019029), (-4.9340121876, 30.8876725294), (-5.0170200476, 30.9446500116))
            ThreePointArc((-5.0170200476, 30.9446500116), (-5.6213249589, 31.2277705376), (-6.2807627766, 31.3301591235))
            ThreePointArc((-6.2807627766, 31.3301591235), (-6.2948875231, 31.3302861065), (-6.309012777, 31.3303284347))
        make_face()
        with BuildLine():
            Line((-6.309012777, 31.3303284347), (-7.4980124951, 31.3303284347))
            Line((-7.4980124951, 31.3303284347), (-7.4980124951, 31.0084326969))
            ThreePointArc((-7.4980124951, 31.0084326969), (-6.9249139857, 31.2484316241), (-6.309012777, 31.3303284347))
        make_face()
        with BuildLine():
            Line((-7.4980124951, 30.8272019029), (-7.4980124951, 31.0084326969))
            ThreePointArc((-7.4980124951, 31.0084326969), (-8.0008898937, 27.3325920712), (-4.3113791264, 27.7227206164))
            ThreePointArc((-4.3113791264, 27.7227206164), (-3.9562194224, 28.8347732192), (-4.1782804969, 29.9808483851))
            ThreePointArc((-4.1782804969, 29.9808483851), (-4.4666385487, 30.443324235), (-4.8535134819, 30.8272019029))
            Line((-4.8535134819, 30.8272019029), (-7.4980124951, 30.8272019029))
        make_face()
        with BuildLine():
            Line((-4.3819672428, 32.9585270347), (-4.3819672428, 33.4))
            Line((-4.3819672428, 33.4), (-6.309012777, 33.4))
            ThreePointArc((-6.309012777, 33.4), (-5.3205287268, 33.288220425), (-4.3819672428, 32.9585270347))
        make_face()
    extrude(amount=F35_DEPTH, mode=Mode.SUBTRACT)

    # F34 (on face) → F36 (join, through all)
    with BuildSketch(Plane.XZ.offset(7.5)):
        with BuildLine():
            ThreePointArc((-2.2529312209, 27.2007325665), (-1.8847040899, 29.114246198), (-2.3738502676, 31.000475679))
            Line((-2.3738502676, 31.000475679), (-4.1782804969, 29.9808483851))
            ThreePointArc((-4.1782804969, 29.9808483851), (-3.9562194224, 28.8347732192), (-4.3113791264, 27.7227206164))
            Line((-4.3113791264, 27.7227206164), (-2.2529312209, 27.2007325665))
        make_face()
    extrude(amount=F36_DEPTH)

    # F37 (on face) → F38 (cut, through all)
    with BuildSketch(Plane(origin=(0, 0, 0), x_dir=(1, 0, 0), z_dir=(0, 0, -1))):
        with BuildLine():
            Line((-9.2466195677, -12.5489608186), (-9.7, -3.3))
            Line((-9.7, -3.3), (-9.7, -13.5))
            Line((-9.7, -13.5), (-8.2478188678, -13.5))
            ThreePointArc((-8.2478188678, -13.5), (-8.937398153, -13.2242101969), (-9.2466195677, -12.5489608186))
        make_face()
        with BuildLine():
            ThreePointArc((9.2466195677, -12.5489608186), (8.937398153, -13.2242101969), (8.2478188678, -13.5))
            Line((8.2478188678, -13.5), (9.7, -13.5))
            Line((9.7, -13.5), (9.7, -3.3))
            Line((9.7, -3.3), (9.2466195677, -12.5489608186))
        make_face()
    extrude(amount=-F38_DEPTH, mode=Mode.SUBTRACT)


solid = f2.part
